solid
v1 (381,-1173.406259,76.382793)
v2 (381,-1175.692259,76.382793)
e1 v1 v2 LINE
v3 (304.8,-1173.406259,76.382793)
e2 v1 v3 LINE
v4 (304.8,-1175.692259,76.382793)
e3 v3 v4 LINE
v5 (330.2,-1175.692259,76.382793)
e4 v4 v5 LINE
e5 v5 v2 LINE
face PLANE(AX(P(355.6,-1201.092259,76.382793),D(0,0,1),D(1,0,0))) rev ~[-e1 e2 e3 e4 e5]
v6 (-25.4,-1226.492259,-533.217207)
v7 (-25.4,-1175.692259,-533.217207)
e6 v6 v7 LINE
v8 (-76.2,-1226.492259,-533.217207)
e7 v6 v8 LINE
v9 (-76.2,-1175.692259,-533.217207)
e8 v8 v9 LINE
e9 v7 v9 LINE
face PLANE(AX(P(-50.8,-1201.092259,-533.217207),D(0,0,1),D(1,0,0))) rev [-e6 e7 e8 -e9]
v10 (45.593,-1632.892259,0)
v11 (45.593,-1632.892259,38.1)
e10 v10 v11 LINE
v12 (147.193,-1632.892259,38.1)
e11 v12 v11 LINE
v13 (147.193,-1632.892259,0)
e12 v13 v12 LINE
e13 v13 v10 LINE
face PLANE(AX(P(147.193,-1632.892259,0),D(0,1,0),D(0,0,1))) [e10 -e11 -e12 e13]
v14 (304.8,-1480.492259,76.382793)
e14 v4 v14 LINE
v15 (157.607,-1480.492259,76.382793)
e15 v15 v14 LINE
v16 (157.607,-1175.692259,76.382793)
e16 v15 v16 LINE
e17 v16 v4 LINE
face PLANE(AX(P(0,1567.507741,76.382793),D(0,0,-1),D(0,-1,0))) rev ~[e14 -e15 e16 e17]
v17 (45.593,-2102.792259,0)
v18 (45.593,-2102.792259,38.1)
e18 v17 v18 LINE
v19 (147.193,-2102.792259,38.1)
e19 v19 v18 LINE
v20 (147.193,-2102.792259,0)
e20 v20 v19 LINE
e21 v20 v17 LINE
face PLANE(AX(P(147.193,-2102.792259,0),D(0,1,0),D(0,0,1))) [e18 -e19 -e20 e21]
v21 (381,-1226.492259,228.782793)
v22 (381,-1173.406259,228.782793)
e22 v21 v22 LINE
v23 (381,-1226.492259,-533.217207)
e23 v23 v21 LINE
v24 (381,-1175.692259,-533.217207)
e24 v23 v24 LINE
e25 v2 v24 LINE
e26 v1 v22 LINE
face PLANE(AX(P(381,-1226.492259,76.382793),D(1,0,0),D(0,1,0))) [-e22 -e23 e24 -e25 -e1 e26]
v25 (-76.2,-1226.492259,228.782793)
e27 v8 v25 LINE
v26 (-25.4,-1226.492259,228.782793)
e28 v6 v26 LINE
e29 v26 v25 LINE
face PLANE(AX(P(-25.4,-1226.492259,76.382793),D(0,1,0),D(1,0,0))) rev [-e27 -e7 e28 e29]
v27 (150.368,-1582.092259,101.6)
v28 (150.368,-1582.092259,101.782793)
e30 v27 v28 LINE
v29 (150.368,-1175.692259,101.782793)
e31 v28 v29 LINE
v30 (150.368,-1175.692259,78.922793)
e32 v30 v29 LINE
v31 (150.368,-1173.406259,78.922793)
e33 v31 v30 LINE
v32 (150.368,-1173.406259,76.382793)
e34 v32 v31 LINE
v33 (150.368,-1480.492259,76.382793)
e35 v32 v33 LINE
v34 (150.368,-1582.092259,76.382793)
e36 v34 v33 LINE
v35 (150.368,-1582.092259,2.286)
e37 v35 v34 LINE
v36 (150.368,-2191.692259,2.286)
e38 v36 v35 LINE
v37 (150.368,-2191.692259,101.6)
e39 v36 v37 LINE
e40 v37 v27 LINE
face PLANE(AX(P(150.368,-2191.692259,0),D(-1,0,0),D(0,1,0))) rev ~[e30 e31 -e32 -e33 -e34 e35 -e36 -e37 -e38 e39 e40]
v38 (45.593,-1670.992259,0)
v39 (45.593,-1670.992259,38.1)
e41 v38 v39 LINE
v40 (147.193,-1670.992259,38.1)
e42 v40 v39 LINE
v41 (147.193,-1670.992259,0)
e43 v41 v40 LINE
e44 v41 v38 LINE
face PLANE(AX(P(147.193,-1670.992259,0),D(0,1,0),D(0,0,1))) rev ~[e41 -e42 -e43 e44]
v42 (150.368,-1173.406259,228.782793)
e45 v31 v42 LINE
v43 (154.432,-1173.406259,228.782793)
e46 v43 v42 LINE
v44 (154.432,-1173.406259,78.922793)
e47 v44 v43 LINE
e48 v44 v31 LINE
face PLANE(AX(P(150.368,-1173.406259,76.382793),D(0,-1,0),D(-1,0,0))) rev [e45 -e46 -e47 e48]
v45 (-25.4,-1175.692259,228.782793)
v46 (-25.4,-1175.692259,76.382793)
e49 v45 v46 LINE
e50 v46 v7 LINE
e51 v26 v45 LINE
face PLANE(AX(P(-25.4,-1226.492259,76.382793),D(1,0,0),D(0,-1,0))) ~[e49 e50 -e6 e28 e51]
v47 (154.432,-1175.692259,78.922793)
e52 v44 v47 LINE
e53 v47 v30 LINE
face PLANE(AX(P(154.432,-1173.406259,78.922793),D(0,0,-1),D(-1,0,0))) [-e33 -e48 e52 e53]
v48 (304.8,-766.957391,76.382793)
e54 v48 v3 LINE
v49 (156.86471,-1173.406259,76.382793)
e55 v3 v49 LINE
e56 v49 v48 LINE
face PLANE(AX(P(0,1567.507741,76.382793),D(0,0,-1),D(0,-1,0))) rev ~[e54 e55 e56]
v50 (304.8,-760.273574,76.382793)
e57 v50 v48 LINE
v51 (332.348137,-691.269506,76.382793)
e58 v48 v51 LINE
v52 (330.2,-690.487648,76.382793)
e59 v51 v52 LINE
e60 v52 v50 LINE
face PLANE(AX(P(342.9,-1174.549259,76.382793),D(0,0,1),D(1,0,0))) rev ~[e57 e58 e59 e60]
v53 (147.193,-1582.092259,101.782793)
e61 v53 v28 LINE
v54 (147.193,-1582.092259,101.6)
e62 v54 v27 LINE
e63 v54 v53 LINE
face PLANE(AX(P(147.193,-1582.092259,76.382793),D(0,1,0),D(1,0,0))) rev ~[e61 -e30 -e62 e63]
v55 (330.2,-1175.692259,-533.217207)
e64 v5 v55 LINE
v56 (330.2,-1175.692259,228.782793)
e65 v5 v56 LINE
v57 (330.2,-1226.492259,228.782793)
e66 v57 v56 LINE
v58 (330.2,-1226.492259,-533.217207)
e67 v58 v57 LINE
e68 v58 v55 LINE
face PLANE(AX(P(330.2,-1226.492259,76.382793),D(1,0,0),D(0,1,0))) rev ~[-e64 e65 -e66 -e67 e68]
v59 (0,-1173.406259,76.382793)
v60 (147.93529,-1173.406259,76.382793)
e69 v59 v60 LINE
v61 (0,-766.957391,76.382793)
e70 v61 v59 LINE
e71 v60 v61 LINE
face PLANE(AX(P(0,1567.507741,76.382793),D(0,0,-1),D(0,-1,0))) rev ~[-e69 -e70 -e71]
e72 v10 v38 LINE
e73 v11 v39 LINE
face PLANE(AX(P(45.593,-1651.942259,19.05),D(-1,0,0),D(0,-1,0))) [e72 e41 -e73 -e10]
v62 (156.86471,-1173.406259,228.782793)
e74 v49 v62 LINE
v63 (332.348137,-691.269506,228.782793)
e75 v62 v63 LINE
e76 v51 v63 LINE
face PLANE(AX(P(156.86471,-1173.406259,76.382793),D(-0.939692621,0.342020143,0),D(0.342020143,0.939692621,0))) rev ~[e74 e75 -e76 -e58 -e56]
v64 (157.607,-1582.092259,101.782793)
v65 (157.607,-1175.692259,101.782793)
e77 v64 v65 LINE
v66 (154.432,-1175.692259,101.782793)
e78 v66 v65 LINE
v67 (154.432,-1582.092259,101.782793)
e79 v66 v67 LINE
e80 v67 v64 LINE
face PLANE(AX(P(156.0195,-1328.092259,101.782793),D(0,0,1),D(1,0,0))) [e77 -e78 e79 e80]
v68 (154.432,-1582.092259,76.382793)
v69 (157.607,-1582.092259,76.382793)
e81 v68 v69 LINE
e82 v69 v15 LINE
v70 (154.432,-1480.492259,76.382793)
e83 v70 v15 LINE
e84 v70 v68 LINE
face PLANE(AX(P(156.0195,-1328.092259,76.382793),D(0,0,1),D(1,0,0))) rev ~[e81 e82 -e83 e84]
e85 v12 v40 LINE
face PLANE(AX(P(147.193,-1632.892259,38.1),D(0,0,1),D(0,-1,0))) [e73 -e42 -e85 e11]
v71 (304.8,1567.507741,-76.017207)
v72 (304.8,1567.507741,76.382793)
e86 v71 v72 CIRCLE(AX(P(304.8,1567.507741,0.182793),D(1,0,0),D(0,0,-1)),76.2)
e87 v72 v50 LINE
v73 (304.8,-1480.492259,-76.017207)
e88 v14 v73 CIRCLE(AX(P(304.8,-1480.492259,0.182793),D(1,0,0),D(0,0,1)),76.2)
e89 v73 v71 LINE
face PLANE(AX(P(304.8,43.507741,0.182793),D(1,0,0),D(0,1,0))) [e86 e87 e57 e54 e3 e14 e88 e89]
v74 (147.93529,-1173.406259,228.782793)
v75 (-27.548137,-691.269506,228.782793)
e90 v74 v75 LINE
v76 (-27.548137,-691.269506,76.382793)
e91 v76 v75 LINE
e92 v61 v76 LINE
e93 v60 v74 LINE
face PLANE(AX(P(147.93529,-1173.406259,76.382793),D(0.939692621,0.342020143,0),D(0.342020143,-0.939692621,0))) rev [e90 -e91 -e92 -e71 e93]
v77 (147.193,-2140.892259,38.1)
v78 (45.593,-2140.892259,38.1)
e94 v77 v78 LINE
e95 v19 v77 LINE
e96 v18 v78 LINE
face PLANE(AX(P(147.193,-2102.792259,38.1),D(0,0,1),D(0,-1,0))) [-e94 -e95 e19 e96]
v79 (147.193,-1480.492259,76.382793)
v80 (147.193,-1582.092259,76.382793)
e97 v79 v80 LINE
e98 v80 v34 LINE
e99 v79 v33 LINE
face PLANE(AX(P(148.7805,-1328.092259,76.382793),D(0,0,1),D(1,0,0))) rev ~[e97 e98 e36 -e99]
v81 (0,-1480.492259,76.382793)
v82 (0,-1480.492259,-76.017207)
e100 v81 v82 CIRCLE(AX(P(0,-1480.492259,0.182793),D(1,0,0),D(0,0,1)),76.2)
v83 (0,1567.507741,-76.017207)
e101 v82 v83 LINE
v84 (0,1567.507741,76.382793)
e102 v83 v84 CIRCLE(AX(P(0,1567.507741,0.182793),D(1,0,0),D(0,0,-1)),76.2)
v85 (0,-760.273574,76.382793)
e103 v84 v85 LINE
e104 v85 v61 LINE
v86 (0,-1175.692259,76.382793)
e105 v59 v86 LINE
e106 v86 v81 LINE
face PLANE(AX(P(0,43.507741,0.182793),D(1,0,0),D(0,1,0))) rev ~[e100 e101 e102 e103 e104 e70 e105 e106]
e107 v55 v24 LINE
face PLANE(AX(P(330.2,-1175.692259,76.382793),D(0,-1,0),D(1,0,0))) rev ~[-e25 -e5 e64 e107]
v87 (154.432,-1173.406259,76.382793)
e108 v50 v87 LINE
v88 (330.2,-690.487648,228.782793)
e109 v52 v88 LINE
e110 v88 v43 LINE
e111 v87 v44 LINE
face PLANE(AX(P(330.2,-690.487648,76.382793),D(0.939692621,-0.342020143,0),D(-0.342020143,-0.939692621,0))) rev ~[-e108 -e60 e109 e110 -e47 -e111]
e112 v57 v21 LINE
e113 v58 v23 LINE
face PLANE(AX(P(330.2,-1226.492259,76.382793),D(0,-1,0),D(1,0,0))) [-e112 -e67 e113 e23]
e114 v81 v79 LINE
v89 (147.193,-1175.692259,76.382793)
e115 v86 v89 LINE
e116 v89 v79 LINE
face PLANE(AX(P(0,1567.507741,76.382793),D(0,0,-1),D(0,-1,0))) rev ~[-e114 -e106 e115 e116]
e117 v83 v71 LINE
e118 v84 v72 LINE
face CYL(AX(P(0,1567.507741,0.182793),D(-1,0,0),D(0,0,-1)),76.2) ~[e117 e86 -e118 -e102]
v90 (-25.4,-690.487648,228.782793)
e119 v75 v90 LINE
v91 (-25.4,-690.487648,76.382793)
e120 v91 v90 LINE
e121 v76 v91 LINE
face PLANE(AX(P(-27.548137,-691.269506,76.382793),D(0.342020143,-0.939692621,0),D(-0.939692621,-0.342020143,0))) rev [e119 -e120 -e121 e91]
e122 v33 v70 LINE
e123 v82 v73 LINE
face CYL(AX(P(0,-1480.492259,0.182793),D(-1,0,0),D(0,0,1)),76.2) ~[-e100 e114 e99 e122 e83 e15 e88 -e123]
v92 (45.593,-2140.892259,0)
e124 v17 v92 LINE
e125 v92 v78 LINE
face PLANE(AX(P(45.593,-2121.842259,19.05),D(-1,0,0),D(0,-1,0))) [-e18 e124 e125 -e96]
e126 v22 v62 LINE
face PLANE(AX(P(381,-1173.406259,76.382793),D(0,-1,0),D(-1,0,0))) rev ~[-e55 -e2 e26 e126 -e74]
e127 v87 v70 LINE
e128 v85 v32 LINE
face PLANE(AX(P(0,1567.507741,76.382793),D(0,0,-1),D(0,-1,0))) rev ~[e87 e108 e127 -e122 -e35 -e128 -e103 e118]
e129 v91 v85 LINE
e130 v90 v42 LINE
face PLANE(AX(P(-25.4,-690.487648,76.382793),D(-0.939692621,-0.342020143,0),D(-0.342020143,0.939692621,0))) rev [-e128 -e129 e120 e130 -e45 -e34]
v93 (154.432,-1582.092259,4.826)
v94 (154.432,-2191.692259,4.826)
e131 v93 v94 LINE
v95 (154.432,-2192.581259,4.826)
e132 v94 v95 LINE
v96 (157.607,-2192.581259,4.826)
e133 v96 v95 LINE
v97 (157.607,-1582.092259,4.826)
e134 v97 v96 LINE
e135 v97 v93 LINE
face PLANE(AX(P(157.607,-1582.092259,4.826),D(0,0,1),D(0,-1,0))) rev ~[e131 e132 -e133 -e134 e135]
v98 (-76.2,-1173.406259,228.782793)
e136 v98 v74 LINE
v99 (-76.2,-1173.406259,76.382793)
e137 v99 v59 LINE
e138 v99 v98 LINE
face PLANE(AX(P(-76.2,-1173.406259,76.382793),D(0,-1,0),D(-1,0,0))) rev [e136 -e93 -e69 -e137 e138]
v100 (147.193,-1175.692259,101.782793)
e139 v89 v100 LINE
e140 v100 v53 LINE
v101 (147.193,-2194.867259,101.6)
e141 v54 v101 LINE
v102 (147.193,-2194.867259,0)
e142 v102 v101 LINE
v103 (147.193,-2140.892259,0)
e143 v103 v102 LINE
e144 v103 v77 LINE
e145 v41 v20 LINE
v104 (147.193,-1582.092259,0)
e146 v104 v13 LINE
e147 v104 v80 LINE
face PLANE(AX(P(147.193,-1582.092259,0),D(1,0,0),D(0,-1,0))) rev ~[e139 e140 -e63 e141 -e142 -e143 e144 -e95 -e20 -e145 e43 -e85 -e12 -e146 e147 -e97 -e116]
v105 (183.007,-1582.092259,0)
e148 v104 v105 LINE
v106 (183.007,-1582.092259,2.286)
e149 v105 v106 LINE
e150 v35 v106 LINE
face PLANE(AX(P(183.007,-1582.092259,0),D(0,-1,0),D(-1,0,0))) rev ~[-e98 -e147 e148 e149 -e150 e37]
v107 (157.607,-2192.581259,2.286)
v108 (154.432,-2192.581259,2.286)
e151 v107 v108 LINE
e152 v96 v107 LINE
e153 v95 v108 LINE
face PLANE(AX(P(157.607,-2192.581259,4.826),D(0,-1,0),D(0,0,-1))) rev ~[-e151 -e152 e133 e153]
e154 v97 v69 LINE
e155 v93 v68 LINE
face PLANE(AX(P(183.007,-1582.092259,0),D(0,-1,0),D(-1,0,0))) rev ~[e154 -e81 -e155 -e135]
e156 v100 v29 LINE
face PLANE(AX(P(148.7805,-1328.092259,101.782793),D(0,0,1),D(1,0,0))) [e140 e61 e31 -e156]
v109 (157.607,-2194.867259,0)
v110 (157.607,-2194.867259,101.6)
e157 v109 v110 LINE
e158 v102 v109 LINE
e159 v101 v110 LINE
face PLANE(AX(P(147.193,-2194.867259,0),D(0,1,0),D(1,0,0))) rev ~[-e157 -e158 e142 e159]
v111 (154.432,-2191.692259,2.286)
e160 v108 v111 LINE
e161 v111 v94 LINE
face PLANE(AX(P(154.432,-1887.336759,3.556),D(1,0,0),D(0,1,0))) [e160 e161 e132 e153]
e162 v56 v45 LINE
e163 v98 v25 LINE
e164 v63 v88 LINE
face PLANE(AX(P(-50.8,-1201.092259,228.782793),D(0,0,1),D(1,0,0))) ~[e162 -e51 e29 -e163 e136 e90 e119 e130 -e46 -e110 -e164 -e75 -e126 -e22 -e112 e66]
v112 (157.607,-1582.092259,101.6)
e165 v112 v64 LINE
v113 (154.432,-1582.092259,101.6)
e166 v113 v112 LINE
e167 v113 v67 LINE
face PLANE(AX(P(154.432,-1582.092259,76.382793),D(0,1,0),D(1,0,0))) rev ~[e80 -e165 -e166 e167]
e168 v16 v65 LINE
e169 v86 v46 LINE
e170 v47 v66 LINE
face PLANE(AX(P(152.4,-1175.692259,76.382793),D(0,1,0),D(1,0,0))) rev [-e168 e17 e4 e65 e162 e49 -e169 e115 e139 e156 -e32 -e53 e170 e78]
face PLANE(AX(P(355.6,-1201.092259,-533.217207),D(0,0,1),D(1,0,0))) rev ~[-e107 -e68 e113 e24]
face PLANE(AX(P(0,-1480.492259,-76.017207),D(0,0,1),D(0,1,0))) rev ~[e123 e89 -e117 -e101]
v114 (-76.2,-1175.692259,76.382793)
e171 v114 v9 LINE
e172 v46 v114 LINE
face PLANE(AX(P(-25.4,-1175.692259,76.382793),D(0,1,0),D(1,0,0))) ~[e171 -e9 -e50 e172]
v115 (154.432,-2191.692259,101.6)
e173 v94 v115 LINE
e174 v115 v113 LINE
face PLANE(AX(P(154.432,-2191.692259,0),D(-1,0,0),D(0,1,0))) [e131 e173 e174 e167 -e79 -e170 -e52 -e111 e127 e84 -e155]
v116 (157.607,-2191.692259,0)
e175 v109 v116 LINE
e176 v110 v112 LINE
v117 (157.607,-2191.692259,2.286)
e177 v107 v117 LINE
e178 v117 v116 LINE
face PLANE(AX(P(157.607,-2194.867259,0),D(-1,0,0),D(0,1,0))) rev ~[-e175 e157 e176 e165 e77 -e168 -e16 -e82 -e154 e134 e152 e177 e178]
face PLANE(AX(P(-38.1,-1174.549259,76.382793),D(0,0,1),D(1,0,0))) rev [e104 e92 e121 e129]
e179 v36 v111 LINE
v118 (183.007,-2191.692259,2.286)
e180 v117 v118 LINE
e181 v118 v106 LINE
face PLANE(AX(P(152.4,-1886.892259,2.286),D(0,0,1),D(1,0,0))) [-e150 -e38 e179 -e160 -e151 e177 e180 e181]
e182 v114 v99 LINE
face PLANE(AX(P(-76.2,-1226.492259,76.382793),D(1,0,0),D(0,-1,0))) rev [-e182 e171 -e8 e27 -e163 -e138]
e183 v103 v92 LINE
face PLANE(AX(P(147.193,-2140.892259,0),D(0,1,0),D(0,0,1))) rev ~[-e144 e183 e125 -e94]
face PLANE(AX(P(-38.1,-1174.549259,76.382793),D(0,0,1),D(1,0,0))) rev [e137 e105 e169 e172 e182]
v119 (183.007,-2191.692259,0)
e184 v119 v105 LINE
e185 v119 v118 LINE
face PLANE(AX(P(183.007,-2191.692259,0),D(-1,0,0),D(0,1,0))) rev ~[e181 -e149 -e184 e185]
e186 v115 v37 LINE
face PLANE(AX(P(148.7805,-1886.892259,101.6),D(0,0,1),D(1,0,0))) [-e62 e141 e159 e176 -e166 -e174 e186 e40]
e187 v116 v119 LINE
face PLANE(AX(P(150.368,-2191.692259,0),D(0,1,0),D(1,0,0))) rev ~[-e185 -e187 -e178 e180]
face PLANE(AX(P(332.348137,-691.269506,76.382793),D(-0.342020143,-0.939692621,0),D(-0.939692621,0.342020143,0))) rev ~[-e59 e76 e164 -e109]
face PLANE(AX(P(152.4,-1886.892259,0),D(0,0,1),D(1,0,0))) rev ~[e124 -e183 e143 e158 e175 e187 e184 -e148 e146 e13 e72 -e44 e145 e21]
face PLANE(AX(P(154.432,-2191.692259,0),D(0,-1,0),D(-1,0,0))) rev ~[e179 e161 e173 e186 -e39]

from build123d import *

# Parameters (mm, degrees)
F1_DEPTH      = 304.8
F3_DEPTH      = 152.4
F2_W          = 50.8
F2_H          = 50.8
F4_DEPTH      = 152.4
F4_DEPTH_BACK = 609.6
F8_W          = 4.064
F8_H          = 2.54
F9_DEPTH      = 2.286
F10_W         = 3.175
F10_H         = 304.8
F10_H_2       = 101.6
F11_DEPTH     = 25.4
F12_W         = 3.175
F12_H         = 609.6
F13_DEPTH     = 101.6
F12_W_2       = 4.064
F12_W_3       = 25.4
F14_DEPTH     = 2.286
F15_W         = 38.1
F15_H         = 38.1
F16_DEPTH     = 101.6
F18_DEPTH     = 3.175


# Not quite as in the source:
# - a feature of the source that left no trace in its solid (it failed there, or was rolled back) is left out
# - a pattern or mirror of a feature is missing from the dataset's text; its kind, count and spacing are read off the source's solid


with BuildPart() as f1:
    # F0 (on Right) → F1 (new body)
    with BuildSketch(Plane.YZ):
        with BuildLine():
            Line((1567.5077411821, 76.3827925089), (-1480.4922588179, 76.3827925089))
            ThreePointArc((-1480.4922588179, 76.3827925089), (-1556.6922588179, 0.1827925089), (-1480.4922588179, -76.0172074911))
            Line((-1480.4922588179, -76.0172074911), (1567.5077411821, -76.0172074911))
            ThreePointArc((1567.5077411821, -76.0172074911), (1643.7077411821, 0.1827925089), (1567.5077411821, 76.3827925089))
        make_face()
    extrude(amount=F1_DEPTH)

    # F2 (on face) → F3 (join)
    with BuildSketch(Plane.XY.offset(76.3827925089)):
        Polygon((330.2, -1175.6922588179), (381, -1175.6922588179), (381, -1173.4062588179), (304.8, -1173.4062588179), (304.8, -1175.6922588179), align=None)
        Polygon((152.4, -1175.6922588179), (304.8, -1175.6922588179), (304.8, -1173.4062588179), (156.8647103879, -1173.4062588179), (154.432, -1173.4062588179), (152.4, -1173.4062588179), align=None)
        Polygon((304.8, -760.2735742093), (304.8, -766.9573910681), (332.3481373311, -691.2695058028), (330.2, -690.4876477552), align=None)
        Polygon((154.432, -1173.4062588179), (156.8647103879, -1173.4062588179), (304.8, -766.9573910681), (304.8, -760.2735742093), align=None)
    f3 = extrude(amount=F3_DEPTH)

    # F3_copies: F3 across plane
    add(f3.mirror(Plane(origin=(152.4, 0, 0), x_dir=(0, 0, -1), z_dir=(-1, 0, 0))))

    # F2 (on face) → F4 (join, two sides)
    with BuildSketch(Plane.XY.offset(76.3827925089)) as f4_sk:
        with Locations((355.6, -1201.0922588179)):
            Rectangle(F2_W, F2_H)
    f4 = extrude(amount=F4_DEPTH) + extrude(f4_sk.sketch, amount=-F4_DEPTH_BACK)

    # F4_copies: F4 across plane
    add(f4.mirror(Plane(origin=(152.4, 0, 0), x_dir=(0, 0, -1), z_dir=(-1, 0, 0))))

    # F8 (on face) → F9 (cut, through all)
    with BuildSketch(Plane(origin=(0, -1173.4062588179, 0), x_dir=(-1, 0, 0), z_dir=(0, 1, 0))):
        with Locations((-152.4, 77.6527925089)):
            Rectangle(F8_W, F8_H)
    extrude(amount=-F9_DEPTH, mode=Mode.SUBTRACT)

    # F10 (on face) → F11 (join)
    with BuildSketch(Plane.XY.offset(76.3827925089)):
        with Locations((156.0195, -1328.0922588179)):
            Rectangle(F10_W, F10_H)
        with Locations((148.7805, -1328.0922588179)):
            Rectangle(F10_W, F10_H)
        with Locations((156.0195, -1531.2922588179)):
            Rectangle(F10_W, F10_H_2)
        with Locations((148.7805, -1531.2922588179)):
            Rectangle(F10_W, F10_H_2)
    extrude(amount=F11_DEPTH)

    # F12 (on Top) → F13 (join)
    with BuildSketch(Plane.XY):
        with Locations((148.7805, -1886.8922588179)):
            Rectangle(F12_W, F12_H)
        with Locations((156.0195, -1886.8922588179)):
            Rectangle(F12_W, F12_H)
        Polygon((154.432, -2191.6922588179), (150.368, -2191.6922588179), (147.193, -2191.6922588179), (147.193, -2194.8672588179), (157.607, -2194.8672588179), (157.607, -2191.6922588179), align=None)
    extrude(amount=F13_DEPTH)

    # F12 (on Top) → F14 (join)
    with BuildSketch(Plane.XY):
        with Locations((152.4, -1886.8922588179)):
            Rectangle(F12_W_2, F12_H)
        with Locations((170.307, -1886.8922588179)):
            Rectangle(F12_W_3, F12_H)
        with Locations((156.0195, -1886.8922588179)):
            Rectangle(F12_W, F12_H)
    extrude(amount=F14_DEPTH)

    # F15 (on face) → F16 (join)
    with BuildSketch(Plane(origin=(147.193, 0, 0), x_dir=(0, -1, 0), z_dir=(-1, 0, 0))):
        with Locations((1651.9422588179, 19.05)):
            Rectangle(F15_W, F15_H)
        with Locations((2121.8422588179, 19.05)):
            Rectangle(F15_W, F15_H)
    extrude(amount=F16_DEPTH)

    # F17 (on face) → F18 (cut, through all)
    with BuildSketch(Plane.YZ.offset(157.607)):
        Polygon((-2192.5812588179, 4.826), (-2192.5812588179, 2.286), (-2191.6922588179, 2.286), (-1582.0922588179, 2.286), (-1582.0922588179, 4.826), align=None)
    extrude(amount=-F18_DEPTH, mode=Mode.SUBTRACT)


solid = f1.part
